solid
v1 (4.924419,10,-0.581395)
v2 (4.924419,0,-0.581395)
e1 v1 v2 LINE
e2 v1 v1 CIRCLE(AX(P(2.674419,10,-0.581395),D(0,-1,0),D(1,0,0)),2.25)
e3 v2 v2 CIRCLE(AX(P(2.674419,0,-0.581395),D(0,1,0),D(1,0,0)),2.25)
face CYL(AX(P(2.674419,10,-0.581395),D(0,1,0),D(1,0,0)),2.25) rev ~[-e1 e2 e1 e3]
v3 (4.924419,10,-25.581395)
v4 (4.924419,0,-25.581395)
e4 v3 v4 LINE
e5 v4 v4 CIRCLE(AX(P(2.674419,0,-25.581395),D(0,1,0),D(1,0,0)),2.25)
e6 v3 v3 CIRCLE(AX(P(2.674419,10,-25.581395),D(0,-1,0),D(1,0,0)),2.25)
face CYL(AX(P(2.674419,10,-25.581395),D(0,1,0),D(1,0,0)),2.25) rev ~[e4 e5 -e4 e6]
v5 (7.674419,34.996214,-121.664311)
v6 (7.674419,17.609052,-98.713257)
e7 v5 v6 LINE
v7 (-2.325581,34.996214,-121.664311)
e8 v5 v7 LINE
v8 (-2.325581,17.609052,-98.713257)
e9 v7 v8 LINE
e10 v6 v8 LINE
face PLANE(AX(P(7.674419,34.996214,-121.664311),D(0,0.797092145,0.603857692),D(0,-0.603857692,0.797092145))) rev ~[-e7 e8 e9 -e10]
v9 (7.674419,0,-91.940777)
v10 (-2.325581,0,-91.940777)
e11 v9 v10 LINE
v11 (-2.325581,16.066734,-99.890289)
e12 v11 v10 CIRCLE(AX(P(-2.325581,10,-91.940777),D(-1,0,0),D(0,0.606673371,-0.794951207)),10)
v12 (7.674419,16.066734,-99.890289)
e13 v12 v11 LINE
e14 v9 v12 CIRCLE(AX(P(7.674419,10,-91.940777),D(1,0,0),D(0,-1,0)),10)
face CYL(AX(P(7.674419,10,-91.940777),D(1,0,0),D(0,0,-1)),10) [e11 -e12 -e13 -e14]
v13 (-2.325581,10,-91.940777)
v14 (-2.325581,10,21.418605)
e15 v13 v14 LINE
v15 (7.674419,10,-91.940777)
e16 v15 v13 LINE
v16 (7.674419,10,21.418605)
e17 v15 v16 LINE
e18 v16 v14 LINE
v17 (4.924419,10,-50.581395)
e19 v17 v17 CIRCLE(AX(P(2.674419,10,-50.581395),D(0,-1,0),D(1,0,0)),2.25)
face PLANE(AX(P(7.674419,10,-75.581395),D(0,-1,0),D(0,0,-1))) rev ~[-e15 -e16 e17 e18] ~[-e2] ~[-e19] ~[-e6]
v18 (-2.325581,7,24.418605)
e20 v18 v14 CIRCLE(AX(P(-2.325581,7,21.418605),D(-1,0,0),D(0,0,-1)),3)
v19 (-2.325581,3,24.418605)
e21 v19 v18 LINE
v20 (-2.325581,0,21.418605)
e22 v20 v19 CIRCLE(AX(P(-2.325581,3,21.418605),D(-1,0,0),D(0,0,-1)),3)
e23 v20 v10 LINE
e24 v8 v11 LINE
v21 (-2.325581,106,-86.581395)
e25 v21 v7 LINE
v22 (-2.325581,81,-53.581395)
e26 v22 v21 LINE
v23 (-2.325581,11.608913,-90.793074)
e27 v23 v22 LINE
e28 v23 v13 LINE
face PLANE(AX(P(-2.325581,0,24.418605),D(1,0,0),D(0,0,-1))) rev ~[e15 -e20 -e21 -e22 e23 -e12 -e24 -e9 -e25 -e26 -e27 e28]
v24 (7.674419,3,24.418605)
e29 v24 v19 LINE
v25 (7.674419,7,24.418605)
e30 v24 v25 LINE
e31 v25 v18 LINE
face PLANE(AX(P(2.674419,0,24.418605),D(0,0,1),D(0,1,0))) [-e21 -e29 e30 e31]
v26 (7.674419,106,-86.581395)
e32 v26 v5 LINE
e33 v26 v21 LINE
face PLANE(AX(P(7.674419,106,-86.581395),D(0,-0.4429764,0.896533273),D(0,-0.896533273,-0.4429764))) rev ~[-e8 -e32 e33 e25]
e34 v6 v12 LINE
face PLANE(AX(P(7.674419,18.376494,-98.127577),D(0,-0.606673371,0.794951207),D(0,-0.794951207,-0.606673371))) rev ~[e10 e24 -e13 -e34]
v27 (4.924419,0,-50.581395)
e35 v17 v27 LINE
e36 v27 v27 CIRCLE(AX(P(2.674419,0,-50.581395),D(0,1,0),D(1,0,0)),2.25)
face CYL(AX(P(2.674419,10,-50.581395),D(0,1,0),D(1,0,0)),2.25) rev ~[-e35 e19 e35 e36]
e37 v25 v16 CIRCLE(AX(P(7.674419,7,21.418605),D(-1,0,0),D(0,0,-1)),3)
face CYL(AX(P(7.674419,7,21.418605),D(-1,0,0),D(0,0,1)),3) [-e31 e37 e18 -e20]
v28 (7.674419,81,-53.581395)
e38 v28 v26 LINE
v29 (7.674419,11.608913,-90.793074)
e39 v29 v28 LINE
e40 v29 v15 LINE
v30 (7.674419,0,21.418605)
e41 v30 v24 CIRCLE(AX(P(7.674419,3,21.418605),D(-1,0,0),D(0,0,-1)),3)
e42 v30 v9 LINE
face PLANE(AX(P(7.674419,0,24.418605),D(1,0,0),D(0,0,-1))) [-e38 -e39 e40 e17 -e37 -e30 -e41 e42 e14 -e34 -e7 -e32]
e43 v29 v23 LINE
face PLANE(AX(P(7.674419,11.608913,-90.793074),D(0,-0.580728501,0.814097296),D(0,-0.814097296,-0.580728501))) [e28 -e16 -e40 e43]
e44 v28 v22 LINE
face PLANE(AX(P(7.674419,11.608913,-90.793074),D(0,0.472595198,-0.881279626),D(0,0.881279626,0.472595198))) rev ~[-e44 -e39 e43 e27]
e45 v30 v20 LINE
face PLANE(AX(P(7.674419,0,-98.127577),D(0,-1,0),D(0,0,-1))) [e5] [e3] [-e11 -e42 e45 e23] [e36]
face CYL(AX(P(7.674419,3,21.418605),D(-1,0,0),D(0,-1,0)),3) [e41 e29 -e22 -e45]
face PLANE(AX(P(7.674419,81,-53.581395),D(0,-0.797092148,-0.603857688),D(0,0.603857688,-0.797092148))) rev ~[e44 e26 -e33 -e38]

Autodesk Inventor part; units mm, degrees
ref_plane "YZ Plane" through (0, 0, 0) normal (1, 0, 0) x (0, 1, 0)
ref_plane "XZ Plane" through (0, 0, 0) normal (0, 1, 0) x (-1, 0, 0)
ref_plane "XY Plane" through (0, 0, 0) normal (0, 0, 1) x (1, 0, 0)
sketch "Sketch1" plane through (0, 0, 0) normal (0, 1, 0) x (-1, 0, 0)
  line L0 (2.325581, 24.418605) -> (-7.674419, 24.418605)
  line L1 (-7.674419, 24.418605) -> (-7.674419, -75.581395)
  line L2 (-7.674419, -75.581395) -> (2.325581, -75.581395)
  line L3 (2.325581, -75.581395) -> (2.325581, 24.418605)
  point P0 (0, 0)
  dimension "d2" = 100
  dimension "d3" = 10
extrude "Extrusion1" add sketch "Sketch1" along normal blind 10
sketch "Sketch9" plane through (7.674419, 0, 24.418605) normal (1, 0, 0) x (0, 0, -1)
  line L0 (0, 10) -> (100, 10) projected
  line L1 (0, 0) -> (100, 0) projected
  line L2 (0, 10) -> (100, 10)
  line L3 (100, 10) -> (100, 0)
  line L4 (100, 0) -> (0, 0)
  line L5 (0, 0) -> (0, 10)
  point P0 (24.418605, 0)
extrude "Extrusion8" cut sketch "Sketch9" against normal blind 5
sketch "Sketch10" plane through (2.674419, 0, 24.418605) normal (1, 0, 0) x (0, 0, -1)
  line L0 (100, 0) -> (100, 10) projected
  line L1 (100, 10) -> (126, 10)
  line L2 (126, 10) -> (126, 29.842)
  line L3 (126, 29.842) -> (100, 10)
  line L4 (126, 29.842) -> (126, 19.842)
  line L5 (126, 19.842) -> (100, 0)
  point P0 (24.418605, 0)
  dimension "d44" = 19.842
  dimension "d45" = 26
  dimension "d46" = 10
extrude "Extrusion9" add sketch "Sketch10" against normal blind 5 contours L0 L1 L5 | L3 L2 L5 L1
sketch "Sketch12" plane through (2.674419, 0, 24.418605) normal (1, 0, 0) x (0, 0, -1)
  line L0 (100, 0) -> (0, 0)
  line L1 (126, 29.842) -> (126, 19.842)
  line L2 (99.933064, 0) -> (126, 19.842)
  line L3 (126, 19.842) -> (126, 29.842)
  line L4 (126, 29.842) -> (99.933064, 10)
  line L5 (99.933064, 10) -> (99.933064, 0)
  point P0 (24.418605, 0)
extrude "Extrusion10" add sketch "Sketch12" along normal blind 5
sketch "Sketch13" plane through (2.674419, 0, 24.418605) normal (1, 0, 0) x (0, 0, -1)
  line L0 (100, 10) -> (0, 10) projected
  line L1 (100, 0) -> (0, 0) projected
  line L2 (0, 10) -> (100, 10)
  line L3 (100, 10) -> (100, 0)
  line L4 (100, 0) -> (0, 0)
  line L5 (0, 0) -> (0, 10)
  point P0 (24.418605, 0)
extrude "Extrusion11" add sketch "Sketch13" along normal blind 5
sketch "Sketch2" plane through (0, 10, 0) normal (0, 1, 0) x (1, 0, 0)
  line L0 (-2.325581, -24.418605) -> (7.674419, -24.418605)
  line L1 (7.674419, -24.418605) -> (7.674419, 75.581395)
  line L2 (-2.325581, -24.418605) -> (7.674419, -24.418605)
  line L3 (2.674419, -24.418605) -> (2.674419, -14.418605)
  line L4 (2.674419, -14.418605) -> (2.674419, -4.418605)
  line L5 (2.674419, -4.418605) -> (2.674419, 10.581395)
  line L6 (2.674419, 10.581395) -> (2.674419, 25.581395)
  line L7 (7.674419, 75.581395) -> (-2.325581, 75.581395)
  line L8 (-2.325581, 75.581395) -> (7.674419, 75.581395)
  line L9 (2.674419, -24.418605) -> (2.674419, 25.581395)
  line L10 (2.674419, 25.581395) -> (7.674419, 25.581395)
  line L11 (2.674419, 25.581395) -> (-2.325581, 25.581395)
  line L12 (-2.325581, 75.581395) -> (-2.325581, -24.418605)
  line L13 (2.674419, 25.581395) -> (2.674419, 40.581395)
  line L14 (2.674419, 25.581395) -> (2.674419, 75.581395)
  line L15 (2.674419, 0.581395) -> (-2.325581, 0.581395)
  line L16 (2.674419, 0.581395) -> (7.674419, 0.581395)
  line L17 (2.674419, 50.581395) -> (-2.325581, 50.581395)
  line L18 (7.674419, 50.581395) -> (2.674419, 50.581395)
  circle A0 centre (2.674419, 0.581395) radius 2.25
  circle A1 centre (2.674419, 25.581395) radius 2.25
  circle A2 centre (2.674419, 50.581395) radius 2.25
  point P0 (0, 0)
  dimension "d28" = 4.5
  dimension "d29" = 4.5
  dimension "d30" = 4.5
extrude "Extrusion2" cut sketch "Sketch2" against normal blind 10 contours A0 L5 L15 | L15 L5 A0 | A1 L13 L11 | L11 L6 A1 | L16 A0 L5 | L5 A0 L16 | L10 A1 L6 | L13 A1 L10 | A2 L14 L17 | L17 L14 A2 | L18 A2 L14 | L14 A2 L18
sketch "Sketch14" plane through (7.674419, 0, 24.418605) normal (1, 0, 0) x (0, 0, -1)
  line L0 (100, 10) -> (0, 10) projected
  line L1 (126, 19.842) -> (100, 0) projected
  line L2 (100, 10) -> (100, 0)
  point P0 (24.418605, 0)
sketch "Sketch16" plane through (7.674419, 0, 24.418605) normal (1, 0, 0) x (0, 0, -1)
  line L0 (100, 10) -> (126, 29.842)
  line L1 (100, 10) -> (112.896482, 19.842)
  line L2 (112.896482, 19.842) -> (113.514198, 20.313412)
  line L3 (113.514198, 20.313412) -> (118.329114, 14.004177)
  line L4 (117.711399, 13.532765) -> (112.884086, 19.858243)
  line L5 (117.711399, 13.532765) -> (118.329114, 14.004177)
  point P0 (24.418605, 0)
  dimension "d60" = 16.22295
  dimension "d61" = 0.77705
extrude "Extrusion13" add sketch "Sketch16" against normal blind 10
sketch "Sketch20" plane through (7.674419, 0, 24.418605) normal (1, 0, 0) x (0, 0, -1)
  line L0 (100, 10) -> (0, 10) projected
  line L1 (100, 10) -> (128, 10)
  line L2 (128, 10) -> (128, 0)
  line L3 (128, 0) -> (100, 0)
  line L4 (100, 0) -> (100, 10)
  line L5 (126, 29.842) -> (100, 10) projected
  line L6 (100, 10) -> (126, 10)
  line L7 (126, 10) -> (126, 29.842)
  line L8 (126, 29.842) -> (100, 29.842)
  line L9 (100, 29.842) -> (100, 10)
  point P0 (24.418605, 0)
  dimension "d77" = 28
extrude "Extrusion17" add sketch "Sketch20" against normal blind 10 contours L1 L2 L3 L4
sketch "Sketch21" plane through (7.674419, 0, 24.418605) normal (1, 0, 0) x (0, 0, -1)
  line L0 (128, 0) -> (128, 10)
  line L1 (128, 0) -> (151.87052, 18.170101)
  line L2 (113.070317, 10) -> (126, 19.842)
  line L3 (128, 10) -> (151.239467, 27.689747)
  line L4 (151.87052, 18.170101) -> (151.87052, 28.170101)
  line L5 (151.87052, 28.170101) -> (151.239467, 27.689747)
  line L6 (100, 10) -> (0, 10)
  line L7 (126, 29.842) -> (100, 29.842)
  line L8 (100, 29.842) -> (100, 10)
  line L9 (100, 10) -> (126, 10)
  line L10 (126, 10) -> (126, 29.842)
  point P0 (24.418605, 0)
extrude "Extrusion18" add sketch "Sketch21" against normal blind 10 contours L0 L3 L5 L4 L1
sketch "Sketch22" plane through (7.674419, 0, 24.418605) normal (1, 0, 0) x (0, 0, -1)
  line L0 (100, 10) -> (126, 29.842) projected
  line L1 (100, 10) -> (0, 10) projected
  line L2 (126, 29.842) -> (100, 29.842)
  line L3 (100, 29.842) -> (100, 10)
  line L4 (100, 10) -> (126, 10)
  line L5 (126, 10) -> (126, 29.842)
  point P0 (24.418605, 0)
extrude "Extrusion19" cut sketch "Sketch22" against normal blind 10
sketch "Sketch23" plane through (7.674419, 0, 24.418605) normal (1, 0, 0) x (0, 0, -1)
  line L0 (151.87052, 18.170101) -> (128, 0)
  line L1 (141.891396, 10.57405) -> (136.99663, 17.004426)
  line L2 (128, 0) -> (151.87052, 18.170101)
  line L3 (128, 10) -> (151.87052, 28.170101)
  line L4 (137.071931, 16.905501) -> (151.87052, 28.170101)
  line L5 (151.87052, 28.170101) -> (151.87052, 18.170101)
  line L6 (141.891396, 10.57405) -> (151.87052, 18.170101)
  point P0 (24.418605, 0)
  point P1 (137.071931, 16.905501)
extrude "Extrusion20" cut sketch "Sketch23" against normal blind 10
sketch "Sketch24" plane through (7.674419, 0, 24.418605) normal (1, 0, 0) x (0, 0, -1)
  line L0 (141.891396, 10.57405) -> (137.071931, 16.905501)
  line L1 (137.071931, 16.905501) -> (120.042183, 39.277911)
  line L2 (120.042183, 39.277911) -> (114.78111, 35.273213)
  line L3 (114.78111, 35.273213) -> (131.810859, 12.900804)
  line L4 (128, 10) -> (137.071931, 16.905501)
  line L5 (130.433663, 25.626361) -> (125.172591, 21.621663)
  point P0 (24.418605, 0)
extrude "Extrusion21" add sketch "Sketch24" against normal blind 10 contours L4 L3 L5 L1
sketch "Sketch25" plane through (7.674419, 0, 24.418605) normal (1, 0, 0) x (0, 0, -1)
  circle A0 centre (130.028114, 20.963065) radius 1.414214
  line L0 (128, 0) -> (141.891396, 10.57405)
  point P0 (24.418605, 0)
  dimension "d88" = 15.452
extrude "Extrusion22" cut sketch "Sketch25" against normal blind 10
sketch "Sketch26" plane through (7.674419, 0, 24.418605) normal (1, 0, 0) x (0, 0, -1)
  line L0 (146.180534, 13.38523) -> (129.005429, 0.311641)
  line L1 (128, 0) -> (141.891396, 10.57405)
  line L2 (129.005429, 0.311641) -> (127.101128, -1.137903)
  line L3 (128, 0) -> (128.596019, 0)
  line L4 (128, 10) -> (141.733271, 10)
  point P0 (24.418605, 0)
  point P1 (137.592982, 6.848436)
  point P2 (141.137252, 10)
  dimension "d89" = 0.361
extrude "Extrusion23" add sketch "Sketch26" against normal blind 10
sketch "Sketch27" plane through (7.674419, 0, 24.418605) normal (1, 0, 0) x (0, 0, -1)
  line L0 (128.596019, 0) -> (141.733271, 10)
  line L1 (141.733271, 10) -> (143.644553, 11.454856)
  line L2 (141.733271, 10) -> (141.137252, 10)
  line L3 (141.733271, 10) -> (141.137252, 10)
  line L4 (141.137252, 10) -> (143.4259, 11.742106)
  line L5 (143.4259, 11.742106) -> (143.644553, 11.454856)
  line L6 (143.4259, 11.742106) -> (141.608381, 14.129826)
  line L7 (141.608381, 14.129826) -> (140.073877, 12.96177)
  line L8 (130.433663, 25.626361) -> (141.891396, 10.57405)
  line L9 (141.891396, 10.57405) -> (140.073877, 12.96177)
  line L10 (141.891396, 10.57405) -> (130.433663, 25.626361)
  point P0 (24.418605, 0)
  dimension "d92" = 2.402
extrude "Extrusion24" add sketch "Sketch27" against normal blind 10
sketch "Sketch28" plane through (7.674419, 0, 24.418605) normal (1, 0, 0) x (0, 0, -1)
  line L0 (129.774875, 26.828636) -> (140.680759, 12.501302)
  line L1 (140.073877, 12.96177) -> (130.433663, 25.626361)
  line L2 (130.433663, 25.626361) -> (130.595987, 25.749921)
  line L3 (140.073877, 12.96177) -> (141.608381, 14.129826)
  line L4 (140.073877, 12.96177) -> (140.2362, 13.08533)
  line L5 (140.073877, 12.96177) -> (130.433663, 25.626361)
  point P0 (24.418605, 0)
  dimension "d95" = 0.204
extrude "Extrusion25" add sketch "Sketch28" against normal blind 10
sketch "Sketch29" plane through (7.674419, 0, 24.418605) normal (1, 0, 0) x (0, 0, -1)
  line L0 (130.595987, 25.749921) -> (140.2362, 13.08533)
  line L1 (130.595987, 25.749921) -> (115.000185, 13.878487)
  line L2 (143.644553, 11.454856) -> (128.596019, 0)
  line L3 (137.494115, 6.773179) -> (119.565826, 30.326023)
  line L4 (122.798086, 19.814204) -> (116.546182, 28.027488)
  circle A0 centre (116.546182, 28.027488) radius 3
  line L5 (116.546182, 28.027488) -> (116.546182, 10)
  line L6 (0, 10) -> (128, 10)
  line L7 (128, 10) -> (100, 10)
  line L8 (116.546182, 28.027488) -> (110.546182, 28.027488)
  line L9 (110.546182, 28.027488) -> (110.546182, 34.027488)
  line L10 (116.546182, 28.027488) -> (122.546182, 28.027488)
  line L11 (122.546182, 28.027488) -> (122.546182, 10)
  line L12 (110.546182, 34.027488) -> (122.546182, 34.027488)
  line L13 (122.546182, 34.027488) -> (122.546182, 10)
  line L14 (122.546182, 10) -> (110.546182, 10)
  line L15 (110.546182, 10) -> (110.546182, 34.027488)
  point P0 (24.418605, 0)
  point P1 (122.546182, 28.027488)
  point P2 (110.546182, 28.027488)
  point P3 (110.546182, 10)
  point P4 (122.546182, 10)
  dimension "d98" = 19.6
  dimension "d99" = 29.6
  dimension "d100" = 6
  dimension "d101" = 6
  dimension "d102" = 6
  dimension "d103" = 6
extrude "Extrusion26" add sketch "Sketch29" against normal blind 10 contours L11 L4 A0 L10 L3 | L3 L10 L11 | L11 L6 L5 L1 | L1 L5 A0 L4 L11 | L10 A0 L8 L9 L12 L13 | L5 L6 L15 L8 A0
sketch "Sketch30" plane through (7.674419, 0, 24.418605) normal (1, 0, 0) x (0, 0, -1)
  line L0 (122.546182, 34.027488) -> (122.546182, 10)
  line L1 (122.546182, 34.027488) -> (144, 34.027488)
  line L2 (144, 34.027488) -> (144, 0)
  line L3 (144, 0) -> (122.546182, 0)
  line L4 (122.546182, 0) -> (122.546182, 34.027488)
  point P0 (24.418605, 0)
extrude "Extrusion27" cut sketch "Sketch30" against normal blind 10
sketch "Sketch31" plane through (7.674419, 0, 24.418605) normal (1, 0, 0) x (0, 0, -1)
  line L0 (110.546182, 34.027488) -> (110.546182, 10)
  line L1 (110.546182, 10) -> (113, 10)
  line L2 (110.546182, 10) -> (114, 10)
  line L3 (114, 10) -> (114, 17)
  line L4 (114, 17) -> (110.546182, 17)
  line L5 (110.546182, 17) -> (110.546182, 10)
  point P0 (24.418605, 0)
extrude "Extrusion28" cut sketch "Sketch31" against normal blind 10
sketch "Sketch32" plane through (7.674419, 0, 24.418605) normal (1, 0, 0) x (0, 0, -1)
  line L0 (114, 17) -> (110.546182, 17)
  line L1 (114, 17) -> (114, 10)
  line L2 (110.546182, 17) -> (114, 10)
  line L3 (114, 10) -> (114, 17)
  line L4 (114, 17) -> (110.546182, 17)
  point P0 (24.418605, 0)
extrude "Extrusion29" add sketch "Sketch32" against normal blind 10
sketch "Sketch33" plane through (7.674419, 0, 24.418605) normal (1, 0, 0) x (0, 0, -1)
  line L0 (100, 10.050951) -> (99.933064, 10)
  line L1 (100, 10.050951) -> (99.933064, 10)
  line L2 (99.933064, 10) -> (100, 10)
  line L3 (99.933064, 10) -> (100, 10)
  line L4 (100, 10) -> (100, 10.050951)
  line L5 (100, 10) -> (100, 10.050951)
  point P0 (24.418605, 0)
extrude "Extrusion30" cut sketch "Sketch33" against normal blind 10
sketch "Sketch34" plane through (7.674419, 0, 24.418605) normal (1, 0, 0) x (0, 0, -1)
  line L0 (119.614525, 21.220993) -> (127.725416, 4.782304)
  line L1 (110.546182, 17) -> (114, 10)
  line L2 (127.725416, 4.782304) -> (130.085017, 0)
  line L3 (122.546182, 0) -> (0, 0)
  line L4 (116.504679, 0) -> (130.085017, 0)
  line L5 (127.725416, 4.782304) -> (130.085017, 0)
  line L6 (122.546182, 34.027488) -> (122.546182, 0)
  line L7 (122.546182, 15.279278) -> (122.546182, 0)
  point P0 (24.418605, 0)
  dimension "d114" = 10
extrude "Extrusion31" add sketch "Sketch34" against normal blind 10
fillet "Fillet2" radius 2 1 edges at (2.6744, 0, -105.6664)
fillet "Fillet3" radius 3 6 edges at (2.6744, 15.2793, -98.1276) (2.6744, 34.0275, -98.1276) (2.6744, 34.0275, -86.1276) (2.6744, 17, -86.1276) (2.6744, 10, 24.4186) (2.6744, 0, 24.4186)
sketch "Sketch35" plane through (7.674419, 0, 24.418605) normal (1, 0, 0) x (0, 0, -1)
  arc A0 (110.546182, 17.699829) -> (110.855838, 16.372406) centre (113.546182, 17.699829) ccw
  line L0 (110.546182, 17.699829) -> (115.999721, 10.054757)
  line L1 (115.999721, 10.054757) -> (113.999721, 10.054757)
  line L2 (110.546182, 17.699829) -> (110.546182, 10.054757)
  line L3 (110.546182, 10.054757) -> (115.999721, 10.054757)
  line L4 (114, 10) -> (3, 10)
  line L5 (110.546182, 10.054757) -> (115.999721, 10.054757)
  point P0 (24.418605, 0)
  point P1 (3, 10)
extrude "Extrusion32" cut sketch "Sketch35" against normal blind 10
sketch "Sketch36" plane through (7.674419, 0, 24.418605) normal (1, 0, 0) x (0, 0, -1)
  line L0 (107, 10) -> (116.657393, 10)
  line L1 (110.546182, 17.699829) -> (115.999721, 10.054757)
  line L2 (3, 0) -> (126.868013, 0)
  line L3 (126, 19.842105) -> (100, 0)
  line L4 (114.482105, 12.631671) -> (116.575951, 9.696402)
  line L5 (115.211679, 11.608913) -> (109.490162, 19.106074)
  line L6 (110.546182, 31.027488) -> (110.546182, 17.699829)
  line L7 (110.546182, 17.699829) -> (110.546182, 10)
  line L8 (110.546182, 10) -> (116.359382, 10)
  point P0 (24.418605, 0)
  point P1 (110.546182, 17.722323)
  dimension "d121" = 0.261
extrude "Extrusion33" cut sketch "Sketch36" against normal blind 10
fillet "Fillet5" radius 3 1 edges at (2.6744, 17.7223, -86.1276)
sketch "Sketch37" plane through (7.674419, 0, 24.418605) normal (1, 0, 0) x (0, 0, -1)
  line L0 (117.932308, 24.527287) -> (136.6505, 0)
  line L1 (111.161328, 16.91627) -> (115.211679, 11.608913)
  line L2 (126.868013, 0) -> (3, 0)
  line L3 (122.31822, 0) -> (151, 0)
  line L4 (122.56441, 18.457636) -> (122.56441, 0)
  line L5 (122, 19.197208) -> (122, 0)
  point P0 (24.418605, 0)
  dimension "d126" = 10
extrude "Extrusion34" add sketch "Sketch37" against normal blind 10
fillet "Fillet6" radius 3 2 edges at (2.6744, 0, -112.2319) (2.6744, 18.4815, -98.1276)
sketch "Sketch38" plane through (7.674419, 0, 24.418605) normal (1, 0, 0) x (0, 0, -1)
  line L0 (116.359382, 10) -> (115.211679, 11.608913)
  circle A0 centre (116.359382, 10) radius 10
  line L1 (116.359382, 0) -> (138.255518, 0)
  line L2 (123.161328, 17.675467) -> (132.972064, 4.82002)
  line L3 (125.598358, 14.482118) -> (136.6505, 0)
  line L4 (122.546182, 31.027488) -> (122.546182, 19.495487)
  line L5 (122.546182, 23.627159) -> (122.546182, 15.627103)
  line L6 (127.492606, 12) -> (119.861027, 22)
  line L7 (122.546182, 18.376494) -> (125.877807, 14.010917)
  line L8 (132.972064, 4.82002) -> (123.161328, 17.675467)
  line L9 (122.546182, 18.376494) -> (122.546182, 19.495487)
  line L10 (136.6505, 0) -> (122.546182, 19.495487)
  point P0 (24.418605, 0)
  point P1 (124.308895, 16.066733)
  dimension "d130" = 20
extrude "Extrusion35" cut sketch "Sketch38" against normal blind 10 contours A0 L7 L5 L6 L2 L3 L1 | L3 L2 L6 L5 L10
sketch "Sketch39" plane through (7.674419, 0, 24.418605) normal (1, 0, 0) x (0, 0, -1)
  point P0 (24.418605, 0)
sketch "Sketch41" plane through (7.674419, 0, 24.418605) normal (1, 0, 0) x (0, 0, -1)
  line L0 (111.161328, 16.91627) -> (115.211679, 11.608913)
  line L1 (115.211679, 11.608913) -> (123.086785, 17.618862)
  line L2 (123.086785, 17.618862) -> (124, 35)
  line L3 (124, 35) -> (108, 35)
  line L4 (108, 35) -> (109, 11.608913)
  line L5 (109, 11.608913) -> (115.211679, 11.608913)
  point P0 (24.418605, 0)
extrude "Extrusion37" cut sketch "Sketch41" against normal blind 10
sketch "Sketch42" plane through (7.674419, 0, 24.418605) normal (1, 0, 0) x (0, 0, -1)
  line L0 (115.211679, 11.608913) -> (78, 81)
  line L1 (78, 81) -> (111, 106)
  line L2 (111, 106) -> (146.082916, 34.996214)
  line L3 (146.082916, 34.996214) -> (115.211679, 11.608913)
  point P0 (24.418605, 0)
extrude "Extrusion38" add sketch "Sketch42" against normal blind 10
equation "\"d0\" = d3"
properties part number "rod"
